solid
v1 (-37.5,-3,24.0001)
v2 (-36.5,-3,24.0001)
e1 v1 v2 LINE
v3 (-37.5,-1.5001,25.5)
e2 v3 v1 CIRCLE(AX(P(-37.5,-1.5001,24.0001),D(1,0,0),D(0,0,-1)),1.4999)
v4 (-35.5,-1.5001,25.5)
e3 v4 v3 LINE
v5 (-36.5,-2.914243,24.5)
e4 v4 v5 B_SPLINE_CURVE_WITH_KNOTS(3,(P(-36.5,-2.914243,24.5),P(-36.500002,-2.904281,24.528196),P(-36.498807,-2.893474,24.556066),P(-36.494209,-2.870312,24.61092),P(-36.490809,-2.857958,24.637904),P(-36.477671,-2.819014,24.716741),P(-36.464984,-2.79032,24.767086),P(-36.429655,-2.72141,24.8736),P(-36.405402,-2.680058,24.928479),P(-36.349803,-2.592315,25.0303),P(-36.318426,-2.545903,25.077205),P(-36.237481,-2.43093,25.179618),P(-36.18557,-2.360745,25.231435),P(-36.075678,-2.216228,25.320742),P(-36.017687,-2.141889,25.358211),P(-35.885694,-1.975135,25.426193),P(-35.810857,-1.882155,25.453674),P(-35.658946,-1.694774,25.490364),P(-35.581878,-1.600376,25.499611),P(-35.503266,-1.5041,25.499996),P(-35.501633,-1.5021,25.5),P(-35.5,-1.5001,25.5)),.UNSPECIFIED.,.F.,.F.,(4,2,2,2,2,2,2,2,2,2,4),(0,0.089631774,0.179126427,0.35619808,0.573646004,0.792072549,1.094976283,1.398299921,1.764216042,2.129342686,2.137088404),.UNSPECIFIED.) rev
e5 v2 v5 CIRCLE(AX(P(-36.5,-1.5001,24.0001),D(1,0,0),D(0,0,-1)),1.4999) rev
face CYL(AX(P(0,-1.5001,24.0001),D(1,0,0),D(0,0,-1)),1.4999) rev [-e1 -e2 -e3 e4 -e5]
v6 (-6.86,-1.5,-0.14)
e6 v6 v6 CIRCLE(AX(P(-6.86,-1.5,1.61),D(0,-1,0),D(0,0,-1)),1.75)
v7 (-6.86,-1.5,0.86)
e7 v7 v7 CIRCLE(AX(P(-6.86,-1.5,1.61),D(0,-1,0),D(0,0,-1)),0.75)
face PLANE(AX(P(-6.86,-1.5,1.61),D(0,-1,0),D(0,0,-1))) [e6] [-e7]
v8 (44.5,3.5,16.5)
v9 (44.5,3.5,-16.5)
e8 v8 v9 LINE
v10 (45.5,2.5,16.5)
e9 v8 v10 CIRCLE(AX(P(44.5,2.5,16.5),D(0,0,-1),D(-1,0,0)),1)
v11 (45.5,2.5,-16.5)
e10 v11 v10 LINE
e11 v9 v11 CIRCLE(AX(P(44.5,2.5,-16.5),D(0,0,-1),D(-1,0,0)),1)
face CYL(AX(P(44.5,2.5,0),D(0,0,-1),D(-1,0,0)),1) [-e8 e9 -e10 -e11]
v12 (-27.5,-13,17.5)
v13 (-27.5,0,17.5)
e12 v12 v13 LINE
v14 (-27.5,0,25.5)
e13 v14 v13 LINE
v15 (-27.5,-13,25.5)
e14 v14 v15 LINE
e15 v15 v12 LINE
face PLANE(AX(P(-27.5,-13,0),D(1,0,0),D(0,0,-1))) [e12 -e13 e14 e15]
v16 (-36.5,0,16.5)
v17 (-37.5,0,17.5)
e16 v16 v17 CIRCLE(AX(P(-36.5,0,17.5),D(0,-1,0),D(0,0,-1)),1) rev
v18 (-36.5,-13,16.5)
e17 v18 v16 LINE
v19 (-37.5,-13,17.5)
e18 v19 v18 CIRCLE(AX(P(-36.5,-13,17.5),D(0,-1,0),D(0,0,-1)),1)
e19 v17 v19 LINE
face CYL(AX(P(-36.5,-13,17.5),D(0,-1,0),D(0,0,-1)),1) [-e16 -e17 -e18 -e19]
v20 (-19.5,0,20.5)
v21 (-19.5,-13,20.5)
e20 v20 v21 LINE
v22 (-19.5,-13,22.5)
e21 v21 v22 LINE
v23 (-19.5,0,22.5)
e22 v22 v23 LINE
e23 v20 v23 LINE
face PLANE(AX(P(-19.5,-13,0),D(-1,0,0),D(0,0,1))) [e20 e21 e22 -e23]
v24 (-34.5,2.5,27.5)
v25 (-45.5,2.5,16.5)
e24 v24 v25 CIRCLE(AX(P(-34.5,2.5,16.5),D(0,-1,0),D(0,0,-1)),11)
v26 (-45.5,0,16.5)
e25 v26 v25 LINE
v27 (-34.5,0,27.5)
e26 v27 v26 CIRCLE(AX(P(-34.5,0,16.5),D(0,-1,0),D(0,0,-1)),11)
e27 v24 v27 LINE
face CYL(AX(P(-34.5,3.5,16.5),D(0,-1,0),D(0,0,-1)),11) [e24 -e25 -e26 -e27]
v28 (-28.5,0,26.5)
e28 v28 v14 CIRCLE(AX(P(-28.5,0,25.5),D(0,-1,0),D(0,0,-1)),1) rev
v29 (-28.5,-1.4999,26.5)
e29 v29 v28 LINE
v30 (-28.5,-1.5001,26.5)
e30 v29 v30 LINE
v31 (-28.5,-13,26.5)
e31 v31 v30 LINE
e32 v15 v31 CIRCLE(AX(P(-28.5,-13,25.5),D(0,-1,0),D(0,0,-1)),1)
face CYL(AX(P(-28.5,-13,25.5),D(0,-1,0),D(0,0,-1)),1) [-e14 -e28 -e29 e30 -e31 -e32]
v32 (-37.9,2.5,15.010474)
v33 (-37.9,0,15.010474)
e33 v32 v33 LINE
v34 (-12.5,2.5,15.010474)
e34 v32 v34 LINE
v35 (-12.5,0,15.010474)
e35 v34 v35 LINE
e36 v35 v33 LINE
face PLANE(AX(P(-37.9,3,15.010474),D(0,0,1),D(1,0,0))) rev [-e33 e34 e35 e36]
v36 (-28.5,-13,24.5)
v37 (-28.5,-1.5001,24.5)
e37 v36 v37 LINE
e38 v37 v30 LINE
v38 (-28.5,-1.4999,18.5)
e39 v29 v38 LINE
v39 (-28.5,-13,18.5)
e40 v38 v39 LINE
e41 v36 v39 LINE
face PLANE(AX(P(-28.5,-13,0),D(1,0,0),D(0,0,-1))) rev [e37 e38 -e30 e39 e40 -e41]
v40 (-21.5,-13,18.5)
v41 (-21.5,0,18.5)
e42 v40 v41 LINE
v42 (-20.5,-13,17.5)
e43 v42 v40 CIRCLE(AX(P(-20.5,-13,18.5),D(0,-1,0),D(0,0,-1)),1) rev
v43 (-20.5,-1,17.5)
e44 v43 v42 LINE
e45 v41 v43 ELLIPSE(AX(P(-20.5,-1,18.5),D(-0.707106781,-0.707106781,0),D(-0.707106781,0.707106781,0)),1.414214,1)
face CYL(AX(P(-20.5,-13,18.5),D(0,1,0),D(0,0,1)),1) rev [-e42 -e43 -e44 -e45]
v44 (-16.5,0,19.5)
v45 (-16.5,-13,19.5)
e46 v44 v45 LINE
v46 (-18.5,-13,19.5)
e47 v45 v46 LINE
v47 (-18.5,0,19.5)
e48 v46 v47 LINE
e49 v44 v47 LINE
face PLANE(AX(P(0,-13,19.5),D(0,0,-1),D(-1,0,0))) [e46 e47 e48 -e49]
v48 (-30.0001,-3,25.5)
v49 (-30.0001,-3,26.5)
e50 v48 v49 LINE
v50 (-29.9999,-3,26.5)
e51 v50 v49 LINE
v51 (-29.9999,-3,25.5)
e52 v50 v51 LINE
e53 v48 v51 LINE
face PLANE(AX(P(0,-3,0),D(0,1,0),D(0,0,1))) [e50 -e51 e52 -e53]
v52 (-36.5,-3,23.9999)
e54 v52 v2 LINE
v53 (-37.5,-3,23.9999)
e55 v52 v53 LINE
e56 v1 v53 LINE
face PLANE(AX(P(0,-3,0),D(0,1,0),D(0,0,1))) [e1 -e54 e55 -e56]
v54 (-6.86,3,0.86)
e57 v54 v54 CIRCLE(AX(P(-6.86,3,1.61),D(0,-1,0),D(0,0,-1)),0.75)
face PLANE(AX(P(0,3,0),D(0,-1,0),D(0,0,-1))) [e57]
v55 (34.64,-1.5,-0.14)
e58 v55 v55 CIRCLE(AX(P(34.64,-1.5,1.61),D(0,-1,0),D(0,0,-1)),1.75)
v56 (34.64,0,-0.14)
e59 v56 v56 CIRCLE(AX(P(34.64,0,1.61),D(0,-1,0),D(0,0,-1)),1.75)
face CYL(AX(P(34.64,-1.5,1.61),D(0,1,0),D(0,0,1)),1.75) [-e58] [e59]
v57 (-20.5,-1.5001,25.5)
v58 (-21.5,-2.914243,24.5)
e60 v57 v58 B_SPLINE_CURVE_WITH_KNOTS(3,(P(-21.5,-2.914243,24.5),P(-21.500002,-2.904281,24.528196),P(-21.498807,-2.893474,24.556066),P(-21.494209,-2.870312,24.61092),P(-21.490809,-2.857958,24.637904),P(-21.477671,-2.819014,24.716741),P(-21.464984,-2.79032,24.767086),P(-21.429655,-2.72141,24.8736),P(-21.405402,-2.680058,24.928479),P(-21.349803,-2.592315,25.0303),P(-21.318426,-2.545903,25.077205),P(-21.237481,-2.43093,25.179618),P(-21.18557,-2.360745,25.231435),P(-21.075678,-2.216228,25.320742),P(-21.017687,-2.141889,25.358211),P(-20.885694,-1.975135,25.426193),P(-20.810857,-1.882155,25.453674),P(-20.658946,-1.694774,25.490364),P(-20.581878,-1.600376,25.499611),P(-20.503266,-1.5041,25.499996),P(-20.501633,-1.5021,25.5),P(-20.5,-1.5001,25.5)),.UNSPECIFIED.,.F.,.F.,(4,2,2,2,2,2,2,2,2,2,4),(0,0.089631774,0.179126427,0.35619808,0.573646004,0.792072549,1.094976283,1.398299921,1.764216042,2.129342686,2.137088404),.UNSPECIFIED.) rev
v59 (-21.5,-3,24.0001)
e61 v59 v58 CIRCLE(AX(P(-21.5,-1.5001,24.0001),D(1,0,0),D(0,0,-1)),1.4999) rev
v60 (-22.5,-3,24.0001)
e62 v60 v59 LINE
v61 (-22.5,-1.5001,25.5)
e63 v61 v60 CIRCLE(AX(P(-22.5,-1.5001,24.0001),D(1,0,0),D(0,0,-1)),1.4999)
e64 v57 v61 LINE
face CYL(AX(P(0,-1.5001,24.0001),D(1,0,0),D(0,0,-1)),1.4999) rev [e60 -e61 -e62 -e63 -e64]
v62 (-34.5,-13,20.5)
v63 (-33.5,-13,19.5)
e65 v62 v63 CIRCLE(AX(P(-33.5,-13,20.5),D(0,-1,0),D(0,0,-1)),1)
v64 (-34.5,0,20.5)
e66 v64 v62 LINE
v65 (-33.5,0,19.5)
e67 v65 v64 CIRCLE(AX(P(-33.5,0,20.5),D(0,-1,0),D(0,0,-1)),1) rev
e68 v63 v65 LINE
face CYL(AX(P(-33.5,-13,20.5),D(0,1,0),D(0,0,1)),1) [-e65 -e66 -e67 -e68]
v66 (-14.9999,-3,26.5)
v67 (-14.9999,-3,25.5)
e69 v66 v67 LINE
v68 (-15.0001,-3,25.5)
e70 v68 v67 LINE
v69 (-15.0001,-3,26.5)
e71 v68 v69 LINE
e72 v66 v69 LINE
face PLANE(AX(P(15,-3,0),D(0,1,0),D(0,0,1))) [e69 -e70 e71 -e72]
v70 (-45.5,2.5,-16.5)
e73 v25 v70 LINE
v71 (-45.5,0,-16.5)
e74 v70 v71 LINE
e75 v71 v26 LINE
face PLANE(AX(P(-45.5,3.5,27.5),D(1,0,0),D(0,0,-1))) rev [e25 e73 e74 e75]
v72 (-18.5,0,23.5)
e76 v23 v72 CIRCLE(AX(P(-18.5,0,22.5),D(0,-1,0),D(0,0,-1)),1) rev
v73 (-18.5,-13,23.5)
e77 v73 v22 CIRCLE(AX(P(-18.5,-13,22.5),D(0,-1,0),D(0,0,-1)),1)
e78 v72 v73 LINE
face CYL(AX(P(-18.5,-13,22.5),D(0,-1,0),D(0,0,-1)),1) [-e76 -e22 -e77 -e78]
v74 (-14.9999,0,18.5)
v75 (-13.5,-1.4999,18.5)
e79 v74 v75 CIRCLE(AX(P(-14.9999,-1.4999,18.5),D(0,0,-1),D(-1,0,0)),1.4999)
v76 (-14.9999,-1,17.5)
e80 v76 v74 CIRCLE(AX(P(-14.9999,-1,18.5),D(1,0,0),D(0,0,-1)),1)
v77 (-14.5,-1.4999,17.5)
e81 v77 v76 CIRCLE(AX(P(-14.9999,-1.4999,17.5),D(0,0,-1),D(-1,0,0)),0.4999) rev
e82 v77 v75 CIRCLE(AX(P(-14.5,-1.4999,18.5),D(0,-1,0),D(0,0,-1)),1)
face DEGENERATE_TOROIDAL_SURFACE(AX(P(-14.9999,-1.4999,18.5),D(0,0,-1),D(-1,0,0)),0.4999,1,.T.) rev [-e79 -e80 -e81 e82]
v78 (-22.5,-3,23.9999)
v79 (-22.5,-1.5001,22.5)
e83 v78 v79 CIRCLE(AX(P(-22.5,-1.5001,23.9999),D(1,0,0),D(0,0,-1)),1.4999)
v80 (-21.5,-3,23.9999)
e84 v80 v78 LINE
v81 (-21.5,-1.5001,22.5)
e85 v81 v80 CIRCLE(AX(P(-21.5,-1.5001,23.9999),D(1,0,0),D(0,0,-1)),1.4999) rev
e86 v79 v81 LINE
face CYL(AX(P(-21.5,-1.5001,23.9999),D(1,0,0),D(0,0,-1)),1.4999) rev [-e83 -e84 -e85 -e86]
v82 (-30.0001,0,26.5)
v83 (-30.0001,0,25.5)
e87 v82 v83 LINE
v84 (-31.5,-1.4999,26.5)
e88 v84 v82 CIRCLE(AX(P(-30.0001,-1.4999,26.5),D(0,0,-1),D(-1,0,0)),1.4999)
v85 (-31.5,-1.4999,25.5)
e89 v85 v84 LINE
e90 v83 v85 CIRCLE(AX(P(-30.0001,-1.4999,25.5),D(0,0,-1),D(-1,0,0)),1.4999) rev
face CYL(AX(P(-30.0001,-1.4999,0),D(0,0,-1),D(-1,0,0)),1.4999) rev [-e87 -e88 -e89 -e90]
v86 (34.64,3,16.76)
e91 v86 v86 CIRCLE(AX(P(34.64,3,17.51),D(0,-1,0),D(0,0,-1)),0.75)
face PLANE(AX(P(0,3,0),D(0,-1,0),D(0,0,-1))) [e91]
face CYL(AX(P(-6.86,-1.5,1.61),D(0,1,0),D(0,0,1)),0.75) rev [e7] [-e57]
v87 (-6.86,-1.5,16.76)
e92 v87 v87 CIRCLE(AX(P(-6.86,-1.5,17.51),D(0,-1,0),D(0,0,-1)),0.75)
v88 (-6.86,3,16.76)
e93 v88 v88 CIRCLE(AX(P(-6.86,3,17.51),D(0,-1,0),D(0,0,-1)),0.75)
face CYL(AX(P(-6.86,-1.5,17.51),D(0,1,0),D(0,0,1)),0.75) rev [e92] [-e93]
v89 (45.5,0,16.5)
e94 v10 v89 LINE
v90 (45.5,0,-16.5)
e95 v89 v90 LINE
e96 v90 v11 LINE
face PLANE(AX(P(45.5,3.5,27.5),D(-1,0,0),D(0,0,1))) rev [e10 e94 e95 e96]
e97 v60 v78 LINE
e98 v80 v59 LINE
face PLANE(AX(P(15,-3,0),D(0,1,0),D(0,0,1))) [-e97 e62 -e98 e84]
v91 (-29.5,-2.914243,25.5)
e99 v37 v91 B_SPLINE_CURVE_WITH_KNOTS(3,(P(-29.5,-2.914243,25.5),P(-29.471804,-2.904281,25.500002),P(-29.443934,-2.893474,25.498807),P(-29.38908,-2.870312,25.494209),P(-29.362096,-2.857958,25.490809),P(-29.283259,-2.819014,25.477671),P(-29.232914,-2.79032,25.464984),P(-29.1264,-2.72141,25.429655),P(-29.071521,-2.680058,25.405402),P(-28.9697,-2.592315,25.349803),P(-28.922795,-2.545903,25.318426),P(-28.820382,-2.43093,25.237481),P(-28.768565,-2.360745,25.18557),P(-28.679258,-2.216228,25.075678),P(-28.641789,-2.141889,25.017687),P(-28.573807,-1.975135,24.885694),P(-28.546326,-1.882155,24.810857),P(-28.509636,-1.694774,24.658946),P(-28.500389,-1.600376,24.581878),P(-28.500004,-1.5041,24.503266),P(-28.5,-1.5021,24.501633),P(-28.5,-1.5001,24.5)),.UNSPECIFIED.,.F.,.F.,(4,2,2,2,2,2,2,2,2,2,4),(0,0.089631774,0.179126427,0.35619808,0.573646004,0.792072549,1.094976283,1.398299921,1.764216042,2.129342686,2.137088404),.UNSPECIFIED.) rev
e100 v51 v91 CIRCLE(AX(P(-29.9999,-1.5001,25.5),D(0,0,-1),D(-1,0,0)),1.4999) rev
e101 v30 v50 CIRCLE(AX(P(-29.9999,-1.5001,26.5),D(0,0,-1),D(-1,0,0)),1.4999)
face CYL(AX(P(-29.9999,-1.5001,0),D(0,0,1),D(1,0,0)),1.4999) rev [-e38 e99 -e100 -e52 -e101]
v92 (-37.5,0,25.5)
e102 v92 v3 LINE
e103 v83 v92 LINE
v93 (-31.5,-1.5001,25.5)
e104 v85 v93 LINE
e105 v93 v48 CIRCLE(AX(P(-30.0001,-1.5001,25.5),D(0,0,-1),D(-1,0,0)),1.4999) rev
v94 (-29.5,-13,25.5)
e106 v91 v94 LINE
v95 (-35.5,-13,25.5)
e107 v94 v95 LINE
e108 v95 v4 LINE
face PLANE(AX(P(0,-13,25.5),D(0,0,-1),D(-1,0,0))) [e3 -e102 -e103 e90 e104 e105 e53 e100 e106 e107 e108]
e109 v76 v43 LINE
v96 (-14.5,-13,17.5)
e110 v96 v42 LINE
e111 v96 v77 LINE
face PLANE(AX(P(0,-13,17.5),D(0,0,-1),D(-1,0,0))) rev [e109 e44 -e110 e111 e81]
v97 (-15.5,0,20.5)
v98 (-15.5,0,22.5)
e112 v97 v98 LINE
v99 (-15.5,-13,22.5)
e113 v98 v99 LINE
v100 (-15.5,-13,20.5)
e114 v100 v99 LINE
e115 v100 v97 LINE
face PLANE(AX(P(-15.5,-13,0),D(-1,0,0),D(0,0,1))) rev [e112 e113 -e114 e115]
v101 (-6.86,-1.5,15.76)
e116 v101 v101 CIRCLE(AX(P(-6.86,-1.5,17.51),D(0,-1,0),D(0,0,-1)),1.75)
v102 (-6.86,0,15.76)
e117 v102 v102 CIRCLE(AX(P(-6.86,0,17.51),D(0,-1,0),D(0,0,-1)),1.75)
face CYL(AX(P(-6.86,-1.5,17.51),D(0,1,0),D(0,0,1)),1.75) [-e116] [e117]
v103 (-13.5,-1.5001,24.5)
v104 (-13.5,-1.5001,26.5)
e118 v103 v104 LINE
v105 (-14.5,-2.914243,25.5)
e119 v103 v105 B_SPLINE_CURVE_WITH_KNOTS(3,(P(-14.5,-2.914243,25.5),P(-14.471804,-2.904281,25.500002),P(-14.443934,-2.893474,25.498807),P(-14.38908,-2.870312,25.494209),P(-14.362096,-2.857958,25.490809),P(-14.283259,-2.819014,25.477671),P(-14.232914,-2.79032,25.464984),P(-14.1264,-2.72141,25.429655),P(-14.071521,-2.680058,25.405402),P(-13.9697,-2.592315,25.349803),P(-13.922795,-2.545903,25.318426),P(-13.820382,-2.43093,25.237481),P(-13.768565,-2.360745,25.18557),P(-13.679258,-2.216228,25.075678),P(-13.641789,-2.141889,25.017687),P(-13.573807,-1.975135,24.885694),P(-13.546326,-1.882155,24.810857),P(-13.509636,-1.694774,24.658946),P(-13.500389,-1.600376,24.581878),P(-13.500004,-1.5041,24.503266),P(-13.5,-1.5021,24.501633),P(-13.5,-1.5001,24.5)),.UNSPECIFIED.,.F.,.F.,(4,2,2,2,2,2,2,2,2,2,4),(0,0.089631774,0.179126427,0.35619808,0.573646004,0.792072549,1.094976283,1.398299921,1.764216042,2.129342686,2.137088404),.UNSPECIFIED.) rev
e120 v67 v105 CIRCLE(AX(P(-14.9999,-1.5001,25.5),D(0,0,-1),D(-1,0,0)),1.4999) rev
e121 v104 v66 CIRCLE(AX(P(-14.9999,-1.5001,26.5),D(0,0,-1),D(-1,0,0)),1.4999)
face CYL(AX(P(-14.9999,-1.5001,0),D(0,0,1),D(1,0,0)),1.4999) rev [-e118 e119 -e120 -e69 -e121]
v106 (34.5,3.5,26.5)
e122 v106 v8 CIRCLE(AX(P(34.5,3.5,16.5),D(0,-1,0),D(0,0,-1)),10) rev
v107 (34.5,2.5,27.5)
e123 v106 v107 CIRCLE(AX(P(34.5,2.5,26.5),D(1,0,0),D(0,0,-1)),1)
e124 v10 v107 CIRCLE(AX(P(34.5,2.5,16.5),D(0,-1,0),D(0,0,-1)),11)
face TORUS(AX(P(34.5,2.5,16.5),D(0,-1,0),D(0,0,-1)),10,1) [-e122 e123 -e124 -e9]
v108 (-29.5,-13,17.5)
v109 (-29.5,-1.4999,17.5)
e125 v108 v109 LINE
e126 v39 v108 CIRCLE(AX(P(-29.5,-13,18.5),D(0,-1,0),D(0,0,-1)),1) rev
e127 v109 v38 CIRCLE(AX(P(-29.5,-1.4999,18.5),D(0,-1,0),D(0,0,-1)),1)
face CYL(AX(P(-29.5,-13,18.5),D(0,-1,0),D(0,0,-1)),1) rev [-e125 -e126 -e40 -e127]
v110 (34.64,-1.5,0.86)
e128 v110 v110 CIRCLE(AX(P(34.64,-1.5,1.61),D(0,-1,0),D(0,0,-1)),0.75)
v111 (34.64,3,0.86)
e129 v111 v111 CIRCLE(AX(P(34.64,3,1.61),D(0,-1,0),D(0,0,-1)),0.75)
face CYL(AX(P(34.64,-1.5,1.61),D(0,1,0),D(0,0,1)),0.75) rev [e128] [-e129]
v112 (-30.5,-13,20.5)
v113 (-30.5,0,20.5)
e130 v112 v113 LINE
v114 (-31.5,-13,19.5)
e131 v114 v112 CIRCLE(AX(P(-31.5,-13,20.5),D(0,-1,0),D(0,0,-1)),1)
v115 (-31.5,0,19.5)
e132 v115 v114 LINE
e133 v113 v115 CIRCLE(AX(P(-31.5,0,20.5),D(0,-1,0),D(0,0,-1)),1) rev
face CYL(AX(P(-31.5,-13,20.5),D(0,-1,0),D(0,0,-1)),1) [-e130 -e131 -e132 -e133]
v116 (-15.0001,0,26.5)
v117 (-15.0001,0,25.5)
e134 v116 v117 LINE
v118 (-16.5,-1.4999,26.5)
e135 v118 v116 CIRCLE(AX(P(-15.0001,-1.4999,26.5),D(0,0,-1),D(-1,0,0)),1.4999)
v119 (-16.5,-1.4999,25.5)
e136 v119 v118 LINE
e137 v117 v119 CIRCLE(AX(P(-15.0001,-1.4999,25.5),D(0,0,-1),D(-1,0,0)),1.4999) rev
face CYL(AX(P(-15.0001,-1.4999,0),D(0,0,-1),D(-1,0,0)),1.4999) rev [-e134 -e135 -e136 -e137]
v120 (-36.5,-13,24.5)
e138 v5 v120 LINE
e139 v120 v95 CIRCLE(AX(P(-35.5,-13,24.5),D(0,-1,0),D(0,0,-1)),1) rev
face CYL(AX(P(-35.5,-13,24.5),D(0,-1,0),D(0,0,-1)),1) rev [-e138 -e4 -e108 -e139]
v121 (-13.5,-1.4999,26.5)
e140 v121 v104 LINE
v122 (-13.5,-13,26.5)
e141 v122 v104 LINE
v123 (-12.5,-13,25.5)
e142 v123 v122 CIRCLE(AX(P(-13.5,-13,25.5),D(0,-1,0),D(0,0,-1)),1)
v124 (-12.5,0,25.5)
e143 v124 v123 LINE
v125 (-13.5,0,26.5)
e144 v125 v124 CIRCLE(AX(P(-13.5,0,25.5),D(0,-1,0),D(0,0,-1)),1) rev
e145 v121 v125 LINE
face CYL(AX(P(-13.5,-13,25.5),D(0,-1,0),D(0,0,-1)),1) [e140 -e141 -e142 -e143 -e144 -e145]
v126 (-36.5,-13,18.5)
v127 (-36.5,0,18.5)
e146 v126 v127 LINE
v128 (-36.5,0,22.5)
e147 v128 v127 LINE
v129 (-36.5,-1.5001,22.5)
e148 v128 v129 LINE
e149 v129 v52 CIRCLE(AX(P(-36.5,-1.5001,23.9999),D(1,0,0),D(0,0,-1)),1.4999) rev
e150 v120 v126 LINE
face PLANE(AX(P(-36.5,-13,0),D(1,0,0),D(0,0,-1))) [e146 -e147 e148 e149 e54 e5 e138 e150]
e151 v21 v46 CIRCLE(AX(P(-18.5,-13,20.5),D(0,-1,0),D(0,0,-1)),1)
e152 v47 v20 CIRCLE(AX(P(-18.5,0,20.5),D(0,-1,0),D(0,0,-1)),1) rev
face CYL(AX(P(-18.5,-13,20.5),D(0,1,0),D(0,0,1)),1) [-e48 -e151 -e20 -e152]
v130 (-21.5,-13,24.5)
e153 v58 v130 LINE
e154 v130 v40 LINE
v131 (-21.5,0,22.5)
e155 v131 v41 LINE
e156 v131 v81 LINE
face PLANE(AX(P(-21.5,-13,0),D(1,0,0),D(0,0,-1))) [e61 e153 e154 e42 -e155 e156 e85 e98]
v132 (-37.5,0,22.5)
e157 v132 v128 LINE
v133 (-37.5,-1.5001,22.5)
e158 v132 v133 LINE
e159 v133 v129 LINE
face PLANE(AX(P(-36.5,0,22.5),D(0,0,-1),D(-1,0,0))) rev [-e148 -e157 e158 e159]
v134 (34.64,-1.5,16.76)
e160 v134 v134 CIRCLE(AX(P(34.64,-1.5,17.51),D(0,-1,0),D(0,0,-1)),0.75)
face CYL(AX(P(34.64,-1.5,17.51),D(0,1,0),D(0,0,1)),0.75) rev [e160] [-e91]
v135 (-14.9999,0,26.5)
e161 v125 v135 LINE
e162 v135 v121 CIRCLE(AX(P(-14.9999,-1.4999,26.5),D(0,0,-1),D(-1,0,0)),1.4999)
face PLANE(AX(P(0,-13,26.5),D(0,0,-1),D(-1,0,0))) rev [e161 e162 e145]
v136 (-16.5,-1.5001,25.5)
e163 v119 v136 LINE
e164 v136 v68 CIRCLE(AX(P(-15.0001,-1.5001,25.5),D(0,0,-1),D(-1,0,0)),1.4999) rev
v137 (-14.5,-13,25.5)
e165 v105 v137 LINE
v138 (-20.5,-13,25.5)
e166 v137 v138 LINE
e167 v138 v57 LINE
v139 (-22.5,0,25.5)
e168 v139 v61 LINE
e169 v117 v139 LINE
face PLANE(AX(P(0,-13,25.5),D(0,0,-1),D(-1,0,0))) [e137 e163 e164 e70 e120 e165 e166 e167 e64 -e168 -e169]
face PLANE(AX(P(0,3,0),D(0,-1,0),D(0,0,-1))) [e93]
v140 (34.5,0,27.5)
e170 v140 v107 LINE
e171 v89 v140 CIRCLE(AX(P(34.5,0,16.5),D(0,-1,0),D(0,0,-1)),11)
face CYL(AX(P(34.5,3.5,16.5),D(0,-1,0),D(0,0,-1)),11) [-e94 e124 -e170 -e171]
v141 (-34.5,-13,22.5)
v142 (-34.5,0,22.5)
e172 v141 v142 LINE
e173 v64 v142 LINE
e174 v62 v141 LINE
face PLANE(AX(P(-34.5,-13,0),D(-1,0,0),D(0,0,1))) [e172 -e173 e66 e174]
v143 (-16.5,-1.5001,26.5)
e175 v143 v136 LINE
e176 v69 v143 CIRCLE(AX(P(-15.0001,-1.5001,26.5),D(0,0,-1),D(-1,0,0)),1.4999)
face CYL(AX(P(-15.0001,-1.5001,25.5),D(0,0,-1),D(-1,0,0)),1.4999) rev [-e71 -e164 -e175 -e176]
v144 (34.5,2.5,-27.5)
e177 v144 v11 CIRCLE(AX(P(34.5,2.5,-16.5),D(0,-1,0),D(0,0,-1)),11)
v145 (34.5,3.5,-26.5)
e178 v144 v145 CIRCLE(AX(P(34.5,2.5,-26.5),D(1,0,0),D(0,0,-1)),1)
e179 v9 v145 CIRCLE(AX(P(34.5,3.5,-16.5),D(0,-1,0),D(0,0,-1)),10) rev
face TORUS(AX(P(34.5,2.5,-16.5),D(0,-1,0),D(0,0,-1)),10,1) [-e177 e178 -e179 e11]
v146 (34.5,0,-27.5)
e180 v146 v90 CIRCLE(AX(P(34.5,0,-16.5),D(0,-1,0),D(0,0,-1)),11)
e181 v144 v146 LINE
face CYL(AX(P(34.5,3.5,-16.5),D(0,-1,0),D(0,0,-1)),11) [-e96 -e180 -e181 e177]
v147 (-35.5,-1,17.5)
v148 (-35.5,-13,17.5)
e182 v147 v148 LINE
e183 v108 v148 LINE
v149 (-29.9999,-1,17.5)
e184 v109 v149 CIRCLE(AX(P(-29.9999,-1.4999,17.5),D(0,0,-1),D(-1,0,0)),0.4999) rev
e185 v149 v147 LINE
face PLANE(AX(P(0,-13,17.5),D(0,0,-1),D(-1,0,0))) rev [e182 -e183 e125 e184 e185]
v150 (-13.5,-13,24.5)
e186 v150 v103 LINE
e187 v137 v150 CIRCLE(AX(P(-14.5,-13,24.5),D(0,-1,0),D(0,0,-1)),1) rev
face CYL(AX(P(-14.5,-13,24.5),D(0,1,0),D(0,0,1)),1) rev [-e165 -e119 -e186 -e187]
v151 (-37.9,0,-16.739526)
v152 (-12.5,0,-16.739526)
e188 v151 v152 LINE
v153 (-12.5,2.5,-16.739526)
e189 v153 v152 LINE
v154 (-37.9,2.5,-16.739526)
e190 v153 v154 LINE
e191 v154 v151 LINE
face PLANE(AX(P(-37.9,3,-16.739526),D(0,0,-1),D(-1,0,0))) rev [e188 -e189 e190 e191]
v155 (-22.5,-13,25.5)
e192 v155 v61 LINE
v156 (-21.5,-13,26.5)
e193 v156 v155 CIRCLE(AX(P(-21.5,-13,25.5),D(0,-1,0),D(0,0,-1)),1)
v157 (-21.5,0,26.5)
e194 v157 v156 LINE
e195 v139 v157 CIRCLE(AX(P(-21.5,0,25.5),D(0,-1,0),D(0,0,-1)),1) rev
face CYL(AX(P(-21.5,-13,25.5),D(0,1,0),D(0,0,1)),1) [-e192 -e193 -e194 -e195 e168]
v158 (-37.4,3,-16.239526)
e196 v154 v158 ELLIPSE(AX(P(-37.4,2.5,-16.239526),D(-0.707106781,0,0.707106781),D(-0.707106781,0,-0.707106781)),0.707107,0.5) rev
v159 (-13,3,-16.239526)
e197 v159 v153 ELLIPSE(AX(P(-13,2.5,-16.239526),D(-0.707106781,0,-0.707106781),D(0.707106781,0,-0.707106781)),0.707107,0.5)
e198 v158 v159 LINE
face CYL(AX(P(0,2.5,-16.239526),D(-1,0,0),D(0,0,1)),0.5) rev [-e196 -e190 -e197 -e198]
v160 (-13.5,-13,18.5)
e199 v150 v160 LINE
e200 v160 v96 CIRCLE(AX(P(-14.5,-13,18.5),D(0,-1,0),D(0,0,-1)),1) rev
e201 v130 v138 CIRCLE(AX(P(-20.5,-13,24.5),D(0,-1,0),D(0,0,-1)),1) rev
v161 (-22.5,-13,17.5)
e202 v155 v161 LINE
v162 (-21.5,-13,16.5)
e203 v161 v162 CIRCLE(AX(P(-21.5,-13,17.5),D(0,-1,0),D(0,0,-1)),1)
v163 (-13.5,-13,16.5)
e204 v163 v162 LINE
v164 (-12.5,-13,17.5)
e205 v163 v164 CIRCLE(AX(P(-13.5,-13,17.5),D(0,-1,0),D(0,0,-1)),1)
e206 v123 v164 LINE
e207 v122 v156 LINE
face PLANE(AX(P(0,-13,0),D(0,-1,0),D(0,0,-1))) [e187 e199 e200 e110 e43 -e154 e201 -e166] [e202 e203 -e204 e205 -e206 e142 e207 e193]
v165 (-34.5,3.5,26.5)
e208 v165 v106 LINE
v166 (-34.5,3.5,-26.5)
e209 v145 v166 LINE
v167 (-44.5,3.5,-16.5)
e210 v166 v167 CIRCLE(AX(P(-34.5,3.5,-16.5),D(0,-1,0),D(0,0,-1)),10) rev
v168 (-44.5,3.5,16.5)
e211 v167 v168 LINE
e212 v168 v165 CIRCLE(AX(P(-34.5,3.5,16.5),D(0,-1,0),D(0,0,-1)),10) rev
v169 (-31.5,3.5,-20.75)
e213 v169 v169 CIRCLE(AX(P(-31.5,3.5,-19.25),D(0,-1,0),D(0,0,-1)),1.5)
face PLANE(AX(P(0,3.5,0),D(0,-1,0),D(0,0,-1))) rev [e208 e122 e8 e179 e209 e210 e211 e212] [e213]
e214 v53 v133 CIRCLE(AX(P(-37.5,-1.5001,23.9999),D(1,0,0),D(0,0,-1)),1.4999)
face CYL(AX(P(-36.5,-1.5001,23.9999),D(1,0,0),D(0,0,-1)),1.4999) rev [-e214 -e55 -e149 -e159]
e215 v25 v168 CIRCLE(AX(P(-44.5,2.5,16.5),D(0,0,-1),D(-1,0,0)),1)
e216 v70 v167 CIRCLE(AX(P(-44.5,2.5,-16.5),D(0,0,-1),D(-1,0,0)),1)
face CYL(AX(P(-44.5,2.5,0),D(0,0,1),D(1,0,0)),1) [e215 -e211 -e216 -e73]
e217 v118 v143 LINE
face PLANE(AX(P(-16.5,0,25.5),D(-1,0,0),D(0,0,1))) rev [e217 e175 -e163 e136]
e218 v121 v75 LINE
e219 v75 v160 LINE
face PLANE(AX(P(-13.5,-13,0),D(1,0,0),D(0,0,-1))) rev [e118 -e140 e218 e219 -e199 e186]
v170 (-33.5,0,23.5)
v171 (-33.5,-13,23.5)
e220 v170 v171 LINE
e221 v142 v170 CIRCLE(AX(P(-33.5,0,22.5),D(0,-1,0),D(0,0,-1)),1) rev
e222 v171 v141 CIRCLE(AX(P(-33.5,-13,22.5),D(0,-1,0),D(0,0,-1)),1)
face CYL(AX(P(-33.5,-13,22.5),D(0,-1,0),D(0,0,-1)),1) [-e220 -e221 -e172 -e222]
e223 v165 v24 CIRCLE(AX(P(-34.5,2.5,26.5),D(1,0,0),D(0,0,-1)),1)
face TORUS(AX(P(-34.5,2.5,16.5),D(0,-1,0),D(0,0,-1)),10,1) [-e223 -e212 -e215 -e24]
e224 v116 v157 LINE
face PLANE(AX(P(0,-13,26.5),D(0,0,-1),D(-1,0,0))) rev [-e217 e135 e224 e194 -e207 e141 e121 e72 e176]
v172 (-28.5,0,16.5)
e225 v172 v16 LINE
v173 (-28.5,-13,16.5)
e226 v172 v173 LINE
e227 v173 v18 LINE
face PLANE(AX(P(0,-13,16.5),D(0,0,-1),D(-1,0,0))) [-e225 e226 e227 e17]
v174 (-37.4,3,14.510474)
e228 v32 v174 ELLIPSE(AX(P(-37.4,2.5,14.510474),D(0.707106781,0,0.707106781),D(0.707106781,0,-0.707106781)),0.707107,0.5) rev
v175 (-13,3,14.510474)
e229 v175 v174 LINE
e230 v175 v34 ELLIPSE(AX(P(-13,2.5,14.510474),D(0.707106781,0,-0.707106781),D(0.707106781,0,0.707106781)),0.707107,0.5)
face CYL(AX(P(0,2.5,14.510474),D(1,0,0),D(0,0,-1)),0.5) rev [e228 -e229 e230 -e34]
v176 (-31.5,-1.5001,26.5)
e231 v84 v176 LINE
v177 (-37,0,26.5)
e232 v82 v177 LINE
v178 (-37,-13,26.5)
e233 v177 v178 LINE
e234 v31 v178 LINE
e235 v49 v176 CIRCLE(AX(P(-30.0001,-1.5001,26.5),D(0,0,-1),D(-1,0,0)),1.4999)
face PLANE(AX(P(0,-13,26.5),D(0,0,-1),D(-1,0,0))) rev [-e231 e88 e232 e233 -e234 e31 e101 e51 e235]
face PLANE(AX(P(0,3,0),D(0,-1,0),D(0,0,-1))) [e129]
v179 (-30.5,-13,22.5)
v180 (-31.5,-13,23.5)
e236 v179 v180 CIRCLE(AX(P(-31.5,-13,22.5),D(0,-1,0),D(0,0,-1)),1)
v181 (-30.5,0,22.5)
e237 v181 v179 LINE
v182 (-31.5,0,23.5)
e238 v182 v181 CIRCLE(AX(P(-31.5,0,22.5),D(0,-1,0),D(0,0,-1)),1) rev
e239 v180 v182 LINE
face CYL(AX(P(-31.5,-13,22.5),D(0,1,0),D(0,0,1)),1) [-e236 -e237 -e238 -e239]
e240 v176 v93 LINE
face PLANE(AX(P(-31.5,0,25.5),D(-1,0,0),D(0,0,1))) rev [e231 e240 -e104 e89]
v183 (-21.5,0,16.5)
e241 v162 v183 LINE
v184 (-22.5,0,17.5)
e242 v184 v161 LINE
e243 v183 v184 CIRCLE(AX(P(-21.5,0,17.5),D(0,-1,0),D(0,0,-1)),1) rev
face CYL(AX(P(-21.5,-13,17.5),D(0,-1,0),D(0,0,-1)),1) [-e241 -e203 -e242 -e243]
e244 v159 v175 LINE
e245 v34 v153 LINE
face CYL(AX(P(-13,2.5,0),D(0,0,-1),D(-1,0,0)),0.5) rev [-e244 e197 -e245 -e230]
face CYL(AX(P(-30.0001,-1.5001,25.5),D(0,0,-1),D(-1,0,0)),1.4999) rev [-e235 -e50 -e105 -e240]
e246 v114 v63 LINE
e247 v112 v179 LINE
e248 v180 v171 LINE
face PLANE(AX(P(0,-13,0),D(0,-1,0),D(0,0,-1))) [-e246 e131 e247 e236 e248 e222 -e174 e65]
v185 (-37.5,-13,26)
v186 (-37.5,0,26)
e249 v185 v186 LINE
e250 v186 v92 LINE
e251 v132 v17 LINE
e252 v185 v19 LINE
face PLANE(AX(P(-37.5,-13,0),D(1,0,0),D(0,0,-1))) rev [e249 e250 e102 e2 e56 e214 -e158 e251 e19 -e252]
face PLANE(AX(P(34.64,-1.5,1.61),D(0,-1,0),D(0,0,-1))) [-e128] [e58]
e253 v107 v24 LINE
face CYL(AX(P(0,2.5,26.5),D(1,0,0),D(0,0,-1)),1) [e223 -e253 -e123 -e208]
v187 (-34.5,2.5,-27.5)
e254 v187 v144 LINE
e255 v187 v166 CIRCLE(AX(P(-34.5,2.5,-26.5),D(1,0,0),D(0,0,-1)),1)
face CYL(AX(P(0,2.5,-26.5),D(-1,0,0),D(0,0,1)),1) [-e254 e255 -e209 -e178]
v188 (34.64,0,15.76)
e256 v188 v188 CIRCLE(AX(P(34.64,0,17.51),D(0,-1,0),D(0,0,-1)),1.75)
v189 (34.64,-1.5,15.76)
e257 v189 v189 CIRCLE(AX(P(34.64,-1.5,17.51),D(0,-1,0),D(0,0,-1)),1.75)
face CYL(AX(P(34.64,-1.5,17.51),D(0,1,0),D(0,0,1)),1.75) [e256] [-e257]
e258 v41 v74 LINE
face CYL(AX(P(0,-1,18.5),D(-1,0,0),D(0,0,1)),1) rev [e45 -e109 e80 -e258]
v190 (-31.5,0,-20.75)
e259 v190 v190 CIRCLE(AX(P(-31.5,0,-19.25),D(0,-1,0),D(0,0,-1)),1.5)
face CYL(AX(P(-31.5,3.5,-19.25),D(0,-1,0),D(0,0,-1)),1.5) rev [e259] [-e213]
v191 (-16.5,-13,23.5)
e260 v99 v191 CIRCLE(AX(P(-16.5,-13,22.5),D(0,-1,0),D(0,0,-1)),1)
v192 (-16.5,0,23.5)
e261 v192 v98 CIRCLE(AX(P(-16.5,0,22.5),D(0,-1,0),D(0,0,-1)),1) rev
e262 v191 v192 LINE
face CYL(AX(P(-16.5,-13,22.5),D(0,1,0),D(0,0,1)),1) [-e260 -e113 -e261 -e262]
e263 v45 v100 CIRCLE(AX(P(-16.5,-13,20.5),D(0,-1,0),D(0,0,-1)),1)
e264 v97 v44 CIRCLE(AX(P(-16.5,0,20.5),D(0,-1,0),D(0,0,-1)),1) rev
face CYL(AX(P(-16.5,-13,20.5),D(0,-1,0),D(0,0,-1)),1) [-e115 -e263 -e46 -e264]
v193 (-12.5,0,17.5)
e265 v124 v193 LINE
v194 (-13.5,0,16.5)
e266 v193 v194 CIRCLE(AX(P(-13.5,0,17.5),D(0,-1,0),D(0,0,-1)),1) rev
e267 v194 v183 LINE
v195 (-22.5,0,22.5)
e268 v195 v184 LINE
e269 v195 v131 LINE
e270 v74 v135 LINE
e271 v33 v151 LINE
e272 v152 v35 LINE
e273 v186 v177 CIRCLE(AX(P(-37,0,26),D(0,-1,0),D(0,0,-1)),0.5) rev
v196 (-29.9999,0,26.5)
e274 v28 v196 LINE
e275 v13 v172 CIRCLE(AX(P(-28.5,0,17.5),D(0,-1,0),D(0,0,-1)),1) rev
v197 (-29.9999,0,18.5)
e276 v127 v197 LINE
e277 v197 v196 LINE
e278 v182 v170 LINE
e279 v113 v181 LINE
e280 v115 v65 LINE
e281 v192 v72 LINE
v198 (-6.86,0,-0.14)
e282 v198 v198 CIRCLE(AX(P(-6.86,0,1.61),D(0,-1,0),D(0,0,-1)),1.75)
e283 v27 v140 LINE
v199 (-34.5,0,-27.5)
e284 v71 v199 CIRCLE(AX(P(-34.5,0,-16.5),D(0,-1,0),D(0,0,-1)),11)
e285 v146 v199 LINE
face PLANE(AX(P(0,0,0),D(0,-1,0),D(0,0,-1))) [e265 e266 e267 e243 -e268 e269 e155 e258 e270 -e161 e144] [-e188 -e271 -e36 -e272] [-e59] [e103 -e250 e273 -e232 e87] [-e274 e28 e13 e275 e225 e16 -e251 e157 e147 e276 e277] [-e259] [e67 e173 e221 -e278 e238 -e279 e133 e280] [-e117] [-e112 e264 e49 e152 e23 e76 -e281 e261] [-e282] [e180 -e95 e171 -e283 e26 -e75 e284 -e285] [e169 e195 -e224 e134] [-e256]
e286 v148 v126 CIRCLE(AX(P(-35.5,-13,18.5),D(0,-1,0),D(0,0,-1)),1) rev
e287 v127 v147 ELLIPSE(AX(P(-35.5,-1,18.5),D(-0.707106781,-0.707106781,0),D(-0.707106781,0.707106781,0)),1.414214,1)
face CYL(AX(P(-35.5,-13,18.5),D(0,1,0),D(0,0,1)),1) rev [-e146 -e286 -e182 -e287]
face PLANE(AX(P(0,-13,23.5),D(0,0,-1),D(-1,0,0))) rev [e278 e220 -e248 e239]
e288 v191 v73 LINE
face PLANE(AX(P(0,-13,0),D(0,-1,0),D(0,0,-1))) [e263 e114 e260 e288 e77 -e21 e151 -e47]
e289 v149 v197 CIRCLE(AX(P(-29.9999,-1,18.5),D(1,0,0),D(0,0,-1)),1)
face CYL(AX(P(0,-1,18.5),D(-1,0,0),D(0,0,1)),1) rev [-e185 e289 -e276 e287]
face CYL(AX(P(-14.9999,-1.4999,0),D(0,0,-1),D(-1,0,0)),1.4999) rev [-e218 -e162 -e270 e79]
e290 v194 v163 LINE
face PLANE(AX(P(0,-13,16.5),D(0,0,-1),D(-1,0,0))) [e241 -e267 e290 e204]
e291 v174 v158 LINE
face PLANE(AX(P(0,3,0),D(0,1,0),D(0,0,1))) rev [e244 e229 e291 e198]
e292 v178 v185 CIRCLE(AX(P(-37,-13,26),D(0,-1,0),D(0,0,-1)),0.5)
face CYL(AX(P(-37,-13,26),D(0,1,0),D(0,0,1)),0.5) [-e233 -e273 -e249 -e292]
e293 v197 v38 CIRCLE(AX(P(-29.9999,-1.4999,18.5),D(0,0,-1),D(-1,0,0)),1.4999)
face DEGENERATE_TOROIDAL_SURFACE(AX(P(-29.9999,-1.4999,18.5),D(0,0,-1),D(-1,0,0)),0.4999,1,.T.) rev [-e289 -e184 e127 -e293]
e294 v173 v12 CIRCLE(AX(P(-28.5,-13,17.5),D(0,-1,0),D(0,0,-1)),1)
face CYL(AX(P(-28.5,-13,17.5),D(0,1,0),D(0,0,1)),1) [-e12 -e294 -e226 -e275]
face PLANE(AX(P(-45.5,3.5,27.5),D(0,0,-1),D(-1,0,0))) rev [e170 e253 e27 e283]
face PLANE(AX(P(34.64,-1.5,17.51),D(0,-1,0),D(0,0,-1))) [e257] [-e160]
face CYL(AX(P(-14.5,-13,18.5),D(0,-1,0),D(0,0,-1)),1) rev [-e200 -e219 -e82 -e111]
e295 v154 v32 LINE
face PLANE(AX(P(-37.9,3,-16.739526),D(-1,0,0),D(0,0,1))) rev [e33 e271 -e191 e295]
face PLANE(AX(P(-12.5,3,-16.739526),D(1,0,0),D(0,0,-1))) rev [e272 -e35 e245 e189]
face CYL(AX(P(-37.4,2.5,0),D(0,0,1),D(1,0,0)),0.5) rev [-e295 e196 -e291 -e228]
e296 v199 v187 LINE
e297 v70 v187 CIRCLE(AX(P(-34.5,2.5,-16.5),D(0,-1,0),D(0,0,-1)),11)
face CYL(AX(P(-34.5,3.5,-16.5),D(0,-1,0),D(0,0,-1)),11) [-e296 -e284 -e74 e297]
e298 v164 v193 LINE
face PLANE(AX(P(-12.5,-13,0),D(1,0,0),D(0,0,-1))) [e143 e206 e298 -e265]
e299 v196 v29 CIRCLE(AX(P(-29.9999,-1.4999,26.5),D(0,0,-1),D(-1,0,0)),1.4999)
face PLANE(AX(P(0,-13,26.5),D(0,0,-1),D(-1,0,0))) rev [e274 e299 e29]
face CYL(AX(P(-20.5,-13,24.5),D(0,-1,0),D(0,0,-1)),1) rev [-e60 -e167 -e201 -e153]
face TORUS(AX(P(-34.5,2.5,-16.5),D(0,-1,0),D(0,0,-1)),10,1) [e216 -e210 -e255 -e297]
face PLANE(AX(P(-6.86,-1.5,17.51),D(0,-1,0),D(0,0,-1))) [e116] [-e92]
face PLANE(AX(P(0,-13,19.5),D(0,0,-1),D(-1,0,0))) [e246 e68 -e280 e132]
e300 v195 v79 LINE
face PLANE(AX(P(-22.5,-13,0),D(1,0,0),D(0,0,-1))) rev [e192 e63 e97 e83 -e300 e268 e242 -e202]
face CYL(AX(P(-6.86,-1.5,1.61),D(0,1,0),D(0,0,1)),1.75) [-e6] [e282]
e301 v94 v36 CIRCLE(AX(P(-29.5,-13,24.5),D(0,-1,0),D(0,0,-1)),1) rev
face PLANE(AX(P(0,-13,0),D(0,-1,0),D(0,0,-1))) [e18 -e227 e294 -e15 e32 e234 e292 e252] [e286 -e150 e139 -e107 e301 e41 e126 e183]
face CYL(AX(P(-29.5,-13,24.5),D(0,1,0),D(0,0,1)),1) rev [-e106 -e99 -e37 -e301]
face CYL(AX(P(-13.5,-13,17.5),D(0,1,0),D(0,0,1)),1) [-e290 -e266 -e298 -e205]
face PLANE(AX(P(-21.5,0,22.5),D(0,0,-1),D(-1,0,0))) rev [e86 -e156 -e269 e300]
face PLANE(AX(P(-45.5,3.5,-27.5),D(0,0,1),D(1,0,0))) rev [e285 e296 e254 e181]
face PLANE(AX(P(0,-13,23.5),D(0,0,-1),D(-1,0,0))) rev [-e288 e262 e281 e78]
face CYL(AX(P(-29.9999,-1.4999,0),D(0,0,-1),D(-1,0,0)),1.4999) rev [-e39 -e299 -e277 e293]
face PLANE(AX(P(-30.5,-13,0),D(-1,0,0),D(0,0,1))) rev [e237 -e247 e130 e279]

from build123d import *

# Parameters (mm, degrees)
SKETCH1_W              = 91
SKETCH1_H              = 55
BOSS_EXTRUDE1_DEPTH    = 3.5
FILLET1_R              = 11
BOSS_EXTRUDE2_START    = -3.5
SKETCH2_W              = 10
SKETCH2_H              = 10
SKETCH2_W_2            = 8
SKETCH2_H_2            = 8
SKETCH2_W_3            = 4
SKETCH2_H_3            = 4
BOSS_EXTRUDE2_DEPTH    = 13
CUT_EXTRUDE1_START     = -10
SKETCH3_W              = 1
SKETCH3_H              = 3
SKETCH3_W_2            = 3
SKETCH3_H_2            = 1
CUT_EXTRUDE1_DEPTH     = 3
FILLET2_R              = 1.4999
LPATTERN1_COUNT        = 2
LPATTERN1_PITCH        = 15
FILLET2_OF_LPATTERN1_R = 1.4999
FILLET3_R              = 0.5
SKETCH4_R              = 1.75
SKETCH4_R_2            = 0.75
BOSS_EXTRUDE3_DEPTH    = 1.5
CUT_EXTRUDE2_START     = -3
SKETCH4_2_R            = 0.75
CUT_EXTRUDE2_DEPTH     = 3
FILLET4_R              = 1
SKETCH5_R              = 1.5
CUT_EXTRUDE3_DEPTH     = 55.731161166
SKETCH6_W              = 25.4
SKETCH6_H              = 31.75
CUT_EXTRUDE4_DEPTH     = 3
FILLET5_R              = 0.5
FILLET6_R              = 1


with BuildPart() as part:
    # Sketch1 → Boss-Extrude1 (new body)
    with BuildSketch(Plane(origin=(0, 0, 0), x_dir=(1, 0, 0), z_dir=(0, 1, 0))):
        Rectangle(SKETCH1_W, SKETCH1_H)
    extrude(amount=BOSS_EXTRUDE1_DEPTH)

    # Fillet1
    fillet1_edges = [part.edges().sort_by_distance(p)[0] for p in [
        (-45.5, 1.75, -27.5),
        (45.5, 1.75, -27.5),
        (45.5, 1.75, 27.5),
        (-45.5, 1.75, 27.5),
    ]]
    fillet(fillet1_edges, radius=FILLET1_R)

    # Sketch2 → Boss-Extrude2 (add)
    # profile 1 of 2: a face of its own
    with BuildSketch(Plane(origin=(0, 3.5, 0), x_dir=(1, 0, 0), z_dir=(0, 1, 0)).offset(BOSS_EXTRUDE2_START)):
        with Locations((-32.5, -21.5)):
            Rectangle(SKETCH2_W, SKETCH2_H)
        with Locations((-32.5, -21.5)):
            Rectangle(SKETCH2_W_2, SKETCH2_H_2, mode=Mode.SUBTRACT)
    # profile 2 of 2: a face of its own
    with BuildSketch(Plane(origin=(0, 3.5, 0), x_dir=(1, 0, 0), z_dir=(0, 1, 0)).offset(BOSS_EXTRUDE2_START)):
        with Locations((-32.5, -21.5)):
            Rectangle(SKETCH2_W_3, SKETCH2_H_3)
    boss_extrude2 = extrude(amount=-BOSS_EXTRUDE2_DEPTH)

    # Sketch3 → Cut-Extrude1 (cut)
    with BuildSketch(Plane(origin=(0, -13, 0), x_dir=(-1, 0, 0), z_dir=(0, -1, 0)).offset(CUT_EXTRUDE1_START)):
        with Locations((37, -24)):
            Rectangle(SKETCH3_W, SKETCH3_H)
        with Locations((30, -26)):
            Rectangle(SKETCH3_W_2, SKETCH3_H_2)
    cut_extrude1 = extrude(amount=-CUT_EXTRUDE1_DEPTH, mode=Mode.SUBTRACT)

    # Fillet2
    fillet2_edges = [part.edges().sort_by_distance(p)[0] for p in [
        (-28.5, 0, 22),
        (-37, -3, 25.5),
        (-37, -3, 22.5),
        (-31.5, 0, 26),
        (-31.5, -3, 26),
        (-28.5, -3, 26),
    ]]
    fillet(fillet2_edges, radius=FILLET2_R)

    # LPattern1: Boss-Extrude2, Cut-Extrude1 ×2
    with Locations(*[(i * LPATTERN1_PITCH, 0, 0) for i in range(1, LPATTERN1_COUNT)]):
        add(boss_extrude2)
        add(cut_extrude1, mode=Mode.SUBTRACT)

    # Fillet2 of LPattern1
    fillet2_of_lpattern1_edges = [part.edges().sort_by_distance(p)[0] for p in [
        (-13.5, 0, 22),
        (-22, -3, 25.5),
        (-22, -3, 22.5),
        (-16.5, 0, 26),
        (-16.5, -3, 26),
        (-13.5, -3, 26),
    ]]
    fillet(fillet2_of_lpattern1_edges, radius=FILLET2_OF_LPATTERN1_R)

    # Fillet3
    fillet3_edges = [part.edges().sort_by_distance(p)[0] for p in [
        (-37.5, -6.5, 26.5),
    ]]
    fillet(fillet3_edges, radius=FILLET3_R)

    # Sketch4 → Boss-Extrude3 (add)
    # profile 1 of 4: a face of its own
    with BuildSketch(Plane.XZ):
        with Locations(Location((34.64, 1.61, 0), (0, 0, 270))):
            Circle(SKETCH4_R)
        with Locations(Location((34.64, 1.61, 0), (0, 0, 270))):
            Circle(SKETCH4_R_2, mode=Mode.SUBTRACT)
    # profile 2 of 4: a face of its own
    with BuildSketch(Plane.XZ):
        with Locations(Location((34.64, 17.51, 0), (0, 0, 270))):
            Circle(SKETCH4_R)
        with Locations(Location((34.64, 17.51, 0), (0, 0, 270))):
            Circle(SKETCH4_R_2, mode=Mode.SUBTRACT)
    # profile 3 of 4: a face of its own
    with BuildSketch(Plane.XZ):
        with Locations(Location((-6.86, 17.51, 0), (0, 0, 270))):
            Circle(SKETCH4_R)
        with Locations(Location((-6.86, 17.51, 0), (0, 0, 270))):
            Circle(SKETCH4_R_2, mode=Mode.SUBTRACT)
    # profile 4 of 4: a face of its own
    with BuildSketch(Plane.XZ):
        with Locations(Location((-6.86, 1.61, 0), (0, 0, 270))):
            Circle(SKETCH4_R)
        with Locations(Location((-6.86, 1.61, 0), (0, 0, 270))):
            Circle(SKETCH4_R_2, mode=Mode.SUBTRACT)
    extrude(amount=BOSS_EXTRUDE3_DEPTH)

    # Sketch4<2> → Cut-Extrude2 (cut)
    with BuildSketch(Plane.XZ.offset(CUT_EXTRUDE2_START)):
        with Locations(Location((-6.86, 1.61, 0), (0, 0, 270))):
            Circle(SKETCH4_2_R)
        with Locations(Location((-6.86, 17.51, 0), (0, 0, 270))):
            Circle(SKETCH4_2_R)
        with Locations(Location((34.64, 17.51, 0), (0, 0, 270))):
            Circle(SKETCH4_2_R)
        with Locations(Location((34.64, 1.61, 0), (0, 0, 270))):
            Circle(SKETCH4_2_R)
    extrude(amount=CUT_EXTRUDE2_DEPTH, mode=Mode.SUBTRACT)

    # Fillet4
    fillet4_edges = [part.edges().sort_by_distance(p)[0] for p in [
        (-33.24995, 0, 17.5),
        (-28.939310539, -0.439310539, 17.5),
        (-12.5, -6.5, 26.5),
        (-22.5, -6.5, 26.5),
        (-22.5, -6.5, 16.5),
        (-12.5, -6.5, 16.5),
        (-21.5, -6.5, 17.5),
        (-13.5, -7.24995, 17.5),
        (-13.5, -7.25005, 25.5),
        (-21.5, -7.25005, 25.5),
        (-19.5, -6.5, 23.5),
        (-19.5, -6.5, 19.5),
        (-15.5, -6.5, 19.5),
        (-15.5, -6.5, 23.5),
        (-18.24995, 0, 17.5),
        (-13.939310539, -0.439310539, 17.5),
        (-27.5, -6.5, 26.5),
        (-37.5, -6.5, 16.5),
        (-27.5, -6.5, 16.5),
        (-36.5, -6.5, 17.5),
        (-28.5, -7.24995, 17.5),
        (-28.5, -7.25005, 25.5),
        (-36.5, -7.25005, 25.5),
        (-34.5, -6.5, 23.5),
        (-34.5, -6.5, 19.5),
        (-30.5, -6.5, 19.5),
        (-30.5, -6.5, 23.5),
    ]]
    fillet(fillet4_edges, radius=FILLET4_R - 0.0001)  # a hair under: the kernel refuses the full size

    # Sketch5 → Cut-Extrude3 (cut, through all)
    with BuildSketch(Plane.XZ):
        with Locations(Location((-31.5, -19.25, 0), (0, 0, 270))):
            Circle(SKETCH5_R)
    extrude(amount=-CUT_EXTRUDE3_DEPTH, mode=Mode.SUBTRACT)

    # Sketch6 → Cut-Extrude4 (cut)
    with BuildSketch(Plane.XZ):
        with Locations((-25.2, -0.864526382)):
            Rectangle(SKETCH6_W, SKETCH6_H)
    extrude(amount=-CUT_EXTRUDE4_DEPTH, mode=Mode.SUBTRACT)

    # Fillet5
    fillet5_edges = [part.edges().sort_by_distance(p)[0] for p in [
        (-37.9, 3, -0.864526382),
        (-25.2, 3, 15.010473618),
        (-12.5, 3, -0.864526382),
        (-25.2, 3, -16.739526382),
    ]]
    fillet(fillet5_edges, radius=FILLET5_R)

    # Fillet6
    fillet6_edges = [part.edges().sort_by_distance(p)[0] for p in [
        (0, 3.5, 27.5),
        (-45.5, 3.5, 0),
        (45.5, 3.5, 0),
        (0, 3.5, -27.5),
        (42.278174593, 3.5, 24.278174593),
        (42.278174593, 3.5, -24.278174593),
        (-42.278174593, 3.5, -24.278174593),
        (-42.278174593, 3.5, 24.278174593),
    ]]
    fillet(fillet6_edges, radius=FILLET6_R)


solid = part.part
